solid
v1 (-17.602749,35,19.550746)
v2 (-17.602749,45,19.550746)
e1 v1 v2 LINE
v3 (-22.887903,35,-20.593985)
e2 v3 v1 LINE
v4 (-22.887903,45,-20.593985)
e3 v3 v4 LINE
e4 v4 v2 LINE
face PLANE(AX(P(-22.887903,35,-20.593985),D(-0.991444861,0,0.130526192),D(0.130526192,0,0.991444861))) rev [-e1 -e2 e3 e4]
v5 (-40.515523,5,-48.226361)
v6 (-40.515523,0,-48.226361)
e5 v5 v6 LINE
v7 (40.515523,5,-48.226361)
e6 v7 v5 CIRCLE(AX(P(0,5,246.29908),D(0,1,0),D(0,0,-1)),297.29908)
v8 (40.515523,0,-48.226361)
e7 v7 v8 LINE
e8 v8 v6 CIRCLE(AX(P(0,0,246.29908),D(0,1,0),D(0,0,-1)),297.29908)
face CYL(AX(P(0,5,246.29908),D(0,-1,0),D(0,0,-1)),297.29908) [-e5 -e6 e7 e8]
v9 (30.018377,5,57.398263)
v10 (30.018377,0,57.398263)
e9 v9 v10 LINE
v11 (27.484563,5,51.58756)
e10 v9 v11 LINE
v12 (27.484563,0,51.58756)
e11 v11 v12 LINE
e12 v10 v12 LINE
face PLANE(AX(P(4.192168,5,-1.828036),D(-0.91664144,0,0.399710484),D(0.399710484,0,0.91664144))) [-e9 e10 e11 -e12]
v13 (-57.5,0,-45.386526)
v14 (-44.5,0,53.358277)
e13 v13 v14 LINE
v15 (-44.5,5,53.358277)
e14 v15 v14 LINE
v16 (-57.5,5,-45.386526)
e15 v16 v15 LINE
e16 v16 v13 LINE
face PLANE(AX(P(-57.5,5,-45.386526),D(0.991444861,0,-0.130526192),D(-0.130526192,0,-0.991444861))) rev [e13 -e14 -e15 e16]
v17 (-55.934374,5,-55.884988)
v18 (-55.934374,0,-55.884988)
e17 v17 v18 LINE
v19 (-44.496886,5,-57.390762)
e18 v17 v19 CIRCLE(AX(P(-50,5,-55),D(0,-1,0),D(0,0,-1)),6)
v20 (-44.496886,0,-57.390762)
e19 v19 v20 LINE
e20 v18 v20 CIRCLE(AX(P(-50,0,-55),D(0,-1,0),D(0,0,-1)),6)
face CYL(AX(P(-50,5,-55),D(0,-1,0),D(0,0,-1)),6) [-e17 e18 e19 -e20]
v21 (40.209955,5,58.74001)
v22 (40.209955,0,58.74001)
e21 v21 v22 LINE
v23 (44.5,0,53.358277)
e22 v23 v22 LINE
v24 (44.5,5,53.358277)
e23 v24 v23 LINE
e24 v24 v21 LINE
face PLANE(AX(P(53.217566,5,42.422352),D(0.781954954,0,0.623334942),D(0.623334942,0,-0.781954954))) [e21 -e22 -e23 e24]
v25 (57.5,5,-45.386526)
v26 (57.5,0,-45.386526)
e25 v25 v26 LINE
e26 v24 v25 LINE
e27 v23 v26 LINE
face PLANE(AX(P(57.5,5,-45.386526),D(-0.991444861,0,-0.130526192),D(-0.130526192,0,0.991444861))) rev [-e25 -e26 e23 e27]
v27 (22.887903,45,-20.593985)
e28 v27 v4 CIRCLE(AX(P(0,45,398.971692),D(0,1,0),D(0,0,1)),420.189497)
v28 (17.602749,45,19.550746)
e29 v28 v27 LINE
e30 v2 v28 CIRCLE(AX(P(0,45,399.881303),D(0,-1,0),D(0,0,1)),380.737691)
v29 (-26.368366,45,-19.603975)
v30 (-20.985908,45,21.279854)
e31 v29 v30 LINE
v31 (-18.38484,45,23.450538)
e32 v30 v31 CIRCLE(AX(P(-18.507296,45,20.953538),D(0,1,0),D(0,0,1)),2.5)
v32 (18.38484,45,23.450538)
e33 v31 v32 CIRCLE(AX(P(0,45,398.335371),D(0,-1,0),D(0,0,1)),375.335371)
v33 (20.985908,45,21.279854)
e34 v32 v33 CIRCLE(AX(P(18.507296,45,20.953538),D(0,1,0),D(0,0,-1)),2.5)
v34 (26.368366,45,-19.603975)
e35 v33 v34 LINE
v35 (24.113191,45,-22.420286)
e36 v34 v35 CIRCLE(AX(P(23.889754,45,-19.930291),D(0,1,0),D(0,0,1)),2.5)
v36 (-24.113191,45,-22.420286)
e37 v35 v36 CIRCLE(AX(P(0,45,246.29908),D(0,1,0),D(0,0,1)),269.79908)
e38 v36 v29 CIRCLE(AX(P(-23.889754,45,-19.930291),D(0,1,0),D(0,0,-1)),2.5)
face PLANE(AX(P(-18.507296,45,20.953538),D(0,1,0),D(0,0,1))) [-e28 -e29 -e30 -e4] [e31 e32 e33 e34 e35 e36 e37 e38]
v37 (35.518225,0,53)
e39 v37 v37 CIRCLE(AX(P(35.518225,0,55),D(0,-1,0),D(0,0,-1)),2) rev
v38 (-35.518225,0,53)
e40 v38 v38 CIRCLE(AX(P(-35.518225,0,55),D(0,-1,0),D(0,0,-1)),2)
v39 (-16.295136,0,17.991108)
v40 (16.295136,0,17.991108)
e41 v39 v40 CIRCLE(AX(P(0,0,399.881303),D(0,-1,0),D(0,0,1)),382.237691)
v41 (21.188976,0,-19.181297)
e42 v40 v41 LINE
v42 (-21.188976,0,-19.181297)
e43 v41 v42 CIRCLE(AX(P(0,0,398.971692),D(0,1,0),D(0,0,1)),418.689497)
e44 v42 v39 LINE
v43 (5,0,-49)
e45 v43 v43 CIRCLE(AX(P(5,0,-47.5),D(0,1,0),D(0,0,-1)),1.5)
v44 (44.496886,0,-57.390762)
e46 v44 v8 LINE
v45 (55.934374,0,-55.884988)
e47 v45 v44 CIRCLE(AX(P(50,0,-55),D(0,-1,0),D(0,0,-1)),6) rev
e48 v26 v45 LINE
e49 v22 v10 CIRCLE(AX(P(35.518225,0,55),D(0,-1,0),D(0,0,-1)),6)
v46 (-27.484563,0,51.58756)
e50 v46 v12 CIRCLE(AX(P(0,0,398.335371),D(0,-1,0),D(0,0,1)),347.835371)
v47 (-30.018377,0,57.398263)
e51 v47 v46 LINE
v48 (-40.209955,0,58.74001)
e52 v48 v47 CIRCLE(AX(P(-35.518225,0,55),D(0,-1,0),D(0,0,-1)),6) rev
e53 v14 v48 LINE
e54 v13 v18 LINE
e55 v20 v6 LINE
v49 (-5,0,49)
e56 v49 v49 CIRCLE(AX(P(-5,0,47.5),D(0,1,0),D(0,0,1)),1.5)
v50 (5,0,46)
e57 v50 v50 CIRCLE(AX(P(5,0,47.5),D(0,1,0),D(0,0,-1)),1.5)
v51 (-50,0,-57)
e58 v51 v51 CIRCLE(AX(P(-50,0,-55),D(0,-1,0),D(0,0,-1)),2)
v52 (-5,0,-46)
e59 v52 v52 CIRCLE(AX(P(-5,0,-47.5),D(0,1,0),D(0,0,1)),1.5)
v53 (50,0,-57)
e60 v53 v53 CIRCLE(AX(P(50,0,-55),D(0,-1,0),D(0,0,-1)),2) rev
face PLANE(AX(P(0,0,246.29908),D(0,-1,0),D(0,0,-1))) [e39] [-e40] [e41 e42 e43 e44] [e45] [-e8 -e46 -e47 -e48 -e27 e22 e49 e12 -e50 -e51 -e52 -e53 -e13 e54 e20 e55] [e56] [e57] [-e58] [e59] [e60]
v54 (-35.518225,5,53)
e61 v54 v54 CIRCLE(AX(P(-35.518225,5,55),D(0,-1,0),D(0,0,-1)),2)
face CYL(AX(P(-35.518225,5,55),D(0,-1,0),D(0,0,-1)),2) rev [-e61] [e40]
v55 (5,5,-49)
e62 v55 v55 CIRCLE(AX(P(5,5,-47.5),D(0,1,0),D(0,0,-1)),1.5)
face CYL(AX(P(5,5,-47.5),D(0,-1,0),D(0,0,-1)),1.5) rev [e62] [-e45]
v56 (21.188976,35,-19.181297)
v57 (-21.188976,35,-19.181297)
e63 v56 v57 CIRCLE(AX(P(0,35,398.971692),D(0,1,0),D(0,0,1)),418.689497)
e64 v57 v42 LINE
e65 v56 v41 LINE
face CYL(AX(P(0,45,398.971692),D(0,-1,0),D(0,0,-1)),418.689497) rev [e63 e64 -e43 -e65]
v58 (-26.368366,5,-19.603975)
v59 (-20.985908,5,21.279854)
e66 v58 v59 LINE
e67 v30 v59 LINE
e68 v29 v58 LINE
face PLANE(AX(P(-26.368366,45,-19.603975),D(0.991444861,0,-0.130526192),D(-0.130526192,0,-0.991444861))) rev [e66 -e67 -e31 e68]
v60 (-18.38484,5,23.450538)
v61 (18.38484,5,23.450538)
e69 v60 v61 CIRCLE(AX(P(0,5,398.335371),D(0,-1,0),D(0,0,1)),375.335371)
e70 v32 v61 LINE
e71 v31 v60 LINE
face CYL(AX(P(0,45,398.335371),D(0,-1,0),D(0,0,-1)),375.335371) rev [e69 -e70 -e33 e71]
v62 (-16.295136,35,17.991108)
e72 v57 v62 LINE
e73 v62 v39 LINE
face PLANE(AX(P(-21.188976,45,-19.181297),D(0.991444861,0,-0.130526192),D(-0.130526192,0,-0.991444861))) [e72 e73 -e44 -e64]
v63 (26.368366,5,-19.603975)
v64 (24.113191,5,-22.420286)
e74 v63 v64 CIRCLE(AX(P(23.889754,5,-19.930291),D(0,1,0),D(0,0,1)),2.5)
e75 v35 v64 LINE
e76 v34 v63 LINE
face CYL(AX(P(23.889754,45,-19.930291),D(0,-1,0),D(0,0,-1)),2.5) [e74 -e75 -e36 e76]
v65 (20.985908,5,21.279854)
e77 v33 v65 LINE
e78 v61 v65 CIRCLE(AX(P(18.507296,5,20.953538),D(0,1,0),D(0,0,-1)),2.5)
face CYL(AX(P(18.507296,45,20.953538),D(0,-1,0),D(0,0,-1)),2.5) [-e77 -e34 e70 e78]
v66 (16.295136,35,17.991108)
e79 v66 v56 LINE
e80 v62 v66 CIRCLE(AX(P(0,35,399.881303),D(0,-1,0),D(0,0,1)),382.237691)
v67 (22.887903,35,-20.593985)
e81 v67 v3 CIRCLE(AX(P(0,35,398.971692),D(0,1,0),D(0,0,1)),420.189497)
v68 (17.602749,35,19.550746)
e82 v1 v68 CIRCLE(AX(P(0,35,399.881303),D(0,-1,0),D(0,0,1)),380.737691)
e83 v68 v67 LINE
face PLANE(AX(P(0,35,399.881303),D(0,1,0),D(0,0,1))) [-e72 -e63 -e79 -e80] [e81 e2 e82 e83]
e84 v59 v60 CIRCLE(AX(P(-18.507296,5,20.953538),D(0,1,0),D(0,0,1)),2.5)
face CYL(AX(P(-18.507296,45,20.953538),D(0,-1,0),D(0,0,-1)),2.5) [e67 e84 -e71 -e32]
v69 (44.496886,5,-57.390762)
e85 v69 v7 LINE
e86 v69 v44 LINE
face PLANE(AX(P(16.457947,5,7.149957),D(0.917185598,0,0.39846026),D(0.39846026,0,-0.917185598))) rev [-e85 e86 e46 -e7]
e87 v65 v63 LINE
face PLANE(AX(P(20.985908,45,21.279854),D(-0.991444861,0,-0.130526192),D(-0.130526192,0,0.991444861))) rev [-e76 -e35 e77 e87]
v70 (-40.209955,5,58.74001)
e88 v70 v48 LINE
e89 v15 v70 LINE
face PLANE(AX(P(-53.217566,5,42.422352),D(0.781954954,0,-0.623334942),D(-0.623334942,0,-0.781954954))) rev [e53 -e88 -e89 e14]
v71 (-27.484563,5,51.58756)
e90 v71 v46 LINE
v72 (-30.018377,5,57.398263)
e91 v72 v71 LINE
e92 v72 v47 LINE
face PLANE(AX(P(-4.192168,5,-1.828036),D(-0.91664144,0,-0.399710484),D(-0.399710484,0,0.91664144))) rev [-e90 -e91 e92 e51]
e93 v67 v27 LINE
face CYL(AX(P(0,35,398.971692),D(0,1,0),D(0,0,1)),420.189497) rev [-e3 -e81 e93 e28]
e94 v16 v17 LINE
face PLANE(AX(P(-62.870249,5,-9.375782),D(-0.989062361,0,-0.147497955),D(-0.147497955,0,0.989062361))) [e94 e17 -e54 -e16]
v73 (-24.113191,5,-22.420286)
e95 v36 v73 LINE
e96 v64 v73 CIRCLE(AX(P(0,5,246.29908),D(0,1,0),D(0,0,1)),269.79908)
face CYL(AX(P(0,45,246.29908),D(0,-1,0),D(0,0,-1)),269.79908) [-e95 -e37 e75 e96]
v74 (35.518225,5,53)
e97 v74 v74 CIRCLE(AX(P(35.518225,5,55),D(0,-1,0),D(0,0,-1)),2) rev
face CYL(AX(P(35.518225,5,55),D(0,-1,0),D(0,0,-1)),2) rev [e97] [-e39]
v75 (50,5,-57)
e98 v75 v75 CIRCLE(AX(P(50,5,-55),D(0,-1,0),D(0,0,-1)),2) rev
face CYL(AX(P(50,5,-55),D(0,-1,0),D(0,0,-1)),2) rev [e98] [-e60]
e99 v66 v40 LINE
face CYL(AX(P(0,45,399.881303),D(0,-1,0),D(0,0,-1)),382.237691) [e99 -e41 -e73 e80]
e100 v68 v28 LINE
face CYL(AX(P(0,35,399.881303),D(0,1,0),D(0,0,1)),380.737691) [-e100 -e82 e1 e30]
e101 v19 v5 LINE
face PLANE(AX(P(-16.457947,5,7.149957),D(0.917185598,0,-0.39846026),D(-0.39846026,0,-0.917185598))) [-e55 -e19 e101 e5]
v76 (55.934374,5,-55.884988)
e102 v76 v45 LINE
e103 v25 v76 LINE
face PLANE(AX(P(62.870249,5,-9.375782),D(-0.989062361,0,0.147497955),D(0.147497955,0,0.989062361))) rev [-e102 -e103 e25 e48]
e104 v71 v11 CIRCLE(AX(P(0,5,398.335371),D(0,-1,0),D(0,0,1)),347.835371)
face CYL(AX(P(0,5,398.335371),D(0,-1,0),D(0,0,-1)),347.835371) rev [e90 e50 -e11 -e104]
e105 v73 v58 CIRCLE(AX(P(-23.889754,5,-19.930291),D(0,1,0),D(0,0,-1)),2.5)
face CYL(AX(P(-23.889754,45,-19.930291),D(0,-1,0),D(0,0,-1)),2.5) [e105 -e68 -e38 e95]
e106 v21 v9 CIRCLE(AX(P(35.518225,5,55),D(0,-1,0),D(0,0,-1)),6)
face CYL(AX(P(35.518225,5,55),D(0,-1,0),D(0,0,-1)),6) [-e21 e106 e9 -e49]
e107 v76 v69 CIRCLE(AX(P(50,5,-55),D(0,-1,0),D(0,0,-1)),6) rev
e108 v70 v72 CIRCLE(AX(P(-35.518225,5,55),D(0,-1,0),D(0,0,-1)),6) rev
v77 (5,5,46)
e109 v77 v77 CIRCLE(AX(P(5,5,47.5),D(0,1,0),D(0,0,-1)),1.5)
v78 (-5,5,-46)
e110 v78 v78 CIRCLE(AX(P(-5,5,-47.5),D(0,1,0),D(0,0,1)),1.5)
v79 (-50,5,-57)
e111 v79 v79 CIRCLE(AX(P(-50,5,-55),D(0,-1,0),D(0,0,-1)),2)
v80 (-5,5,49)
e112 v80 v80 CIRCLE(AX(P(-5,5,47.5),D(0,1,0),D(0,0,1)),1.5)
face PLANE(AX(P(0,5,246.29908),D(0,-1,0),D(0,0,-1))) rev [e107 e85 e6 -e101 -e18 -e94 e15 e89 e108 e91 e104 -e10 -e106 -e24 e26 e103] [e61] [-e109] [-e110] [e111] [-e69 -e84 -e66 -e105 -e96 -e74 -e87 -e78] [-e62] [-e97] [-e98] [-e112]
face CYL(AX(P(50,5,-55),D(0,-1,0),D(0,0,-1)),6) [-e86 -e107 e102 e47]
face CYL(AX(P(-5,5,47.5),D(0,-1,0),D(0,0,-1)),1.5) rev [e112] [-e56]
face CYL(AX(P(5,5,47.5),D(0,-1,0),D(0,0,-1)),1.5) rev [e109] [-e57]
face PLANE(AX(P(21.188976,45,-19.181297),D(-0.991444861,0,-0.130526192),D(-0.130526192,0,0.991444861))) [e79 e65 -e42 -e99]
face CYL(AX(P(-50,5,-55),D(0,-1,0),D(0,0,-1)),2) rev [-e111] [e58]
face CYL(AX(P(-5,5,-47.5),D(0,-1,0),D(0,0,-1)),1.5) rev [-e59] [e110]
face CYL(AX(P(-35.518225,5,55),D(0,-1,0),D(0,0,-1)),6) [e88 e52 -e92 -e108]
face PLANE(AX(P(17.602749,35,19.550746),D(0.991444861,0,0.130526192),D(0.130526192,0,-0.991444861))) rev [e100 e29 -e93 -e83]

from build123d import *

# Parameters (mm, degrees)
SKETCH1_R               = 1.5
BOSS_EXTRUDE1_DEPTH     = 5
BOSS_EXTRUDE2_DEPTH     = 40
CUT_EXTRUDE1_DEPTH      = 91.434261951
BOSS_EXTRUDE3_START     = -5
BOSS_EXTRUDE3_OUTLINE_R = 2
BOSS_EXTRUDE3_DEPTH     = 5
CUT_EXTRUDE2_START      = -10
CUT_EXTRUDE2_DEPTH      = 10


# Read off the part's stored shape, not the designer's step: Boss-Extrude3
with BuildPart() as part:
    # Sketch1 → Boss-Extrude1 (new body)
    with BuildSketch(Plane(origin=(0, 0, 0), x_dir=(1, 0, 0), z_dir=(0, 1, 0))):
        with BuildLine():
            Line((-57.5, 45.38652637), (-44.5, -53.358277095))
            ThreePointArc((-44.5, -53.358277095), (0, -50.5), (44.5, -53.358277095))
            Line((44.5, -53.358277095), (57.5, 45.38652637))
            ThreePointArc((57.5, 45.38652637), (0, 51), (-57.5, 45.38652637))
        make_face()
        with Locations(Location((-5, 47.5, 0), (0, 0, 270))):
            Circle(SKETCH1_R, mode=Mode.SUBTRACT)
        with Locations(Location((-5, -47.5, 0), (0, 0, 270))):
            Circle(SKETCH1_R, mode=Mode.SUBTRACT)
        with Locations(Location((5, -47.5, 0), (0, 0, 90))):
            Circle(SKETCH1_R, mode=Mode.SUBTRACT)
        with Locations(Location((5, 47.5, 0), (0, 0, 90))):
            Circle(SKETCH1_R, mode=Mode.SUBTRACT)
    extrude(amount=BOSS_EXTRUDE1_DEPTH)

    # Sketch2 → Boss-Extrude2 (add)
    with BuildSketch(Plane(origin=(0, 5, 0), x_dir=(1, 0, 0), z_dir=(0, 1, 0))):
        with BuildLine():
            Line((-26.368366328, 19.603975201), (-20.985908119, -21.279853883))
            ThreePointArc((-20.985908119, -21.279853883), (-20.109118271, -22.872956361), (-18.384839881, -23.450537503))
            ThreePointArc((-18.384839881, -23.450537503), (0, -23), (18.384839881, -23.450537503))
            ThreePointArc((18.384839881, -23.450537503), (20.109118271, -22.872956361), (20.985908119, -21.279853883))
            Line((20.985908119, -21.279853883), (26.368366328, 19.603975201))
            ThreePointArc((26.368366328, 19.603975201), (25.841207036, 21.492926829), (24.11319073, 22.420285883))
            ThreePointArc((24.11319073, 22.420285883), (0, 23.5), (-24.11319073, 22.420285883))
            ThreePointArc((-24.11319073, 22.420285883), (-25.841207036, 21.492926829), (-26.368366328, 19.603975201))
        make_face()
    extrude(amount=BOSS_EXTRUDE2_DEPTH)

    # Sketch3 → Cut-Extrude1 (cut, through all)
    with BuildSketch(Plane(origin=(0, 0, 0), x_dir=(1, 0, 0), z_dir=(0, 1, 0))):
        with BuildLine():
            Line((-21.18897611, 19.181297446), (-16.295136113, -17.99110784))
            ThreePointArc((-16.295136113, -17.99110784), (0, -17.643611739), (16.295136113, -17.99110784))
            Line((16.295136113, -17.99110784), (21.18897611, 19.181297446))
            ThreePointArc((21.18897611, 19.181297446), (0, 19.717805469), (-21.18897611, 19.181297446))
        make_face()
    extrude(amount=CUT_EXTRUDE1_DEPTH, mode=Mode.SUBTRACT)

    # Boss-Extrude3 outline → Boss-Extrude3 (add)
    # profile 1 of 4: a face of its own
    with BuildSketch(Plane.XZ.offset(BOSS_EXTRUDE3_START)):
        with BuildLine():
            Line((-44.496886412, -57.390761561), (-40.51552272, -48.226360981))
            ThreePointArc((-40.51552272, -48.226360981), (-49.028326901, -46.92944202), (-57.5, -45.38652637))
            Line((-57.5, -45.38652637), (-55.934374164, -55.884987732))
            ThreePointArc((-55.934374164, -55.884987732), (-50.783157153, -60.948669168), (-44.496886412, -57.390761561))
        make_face()
        with Locations((-50, -55)):
            Circle(BOSS_EXTRUDE3_OUTLINE_R, mode=Mode.SUBTRACT)
    # profile 2 of 4: a face of its own
    with BuildSketch(Plane.XZ.offset(BOSS_EXTRUDE3_START)):
        with BuildLine():
            Line((40.51552272, -48.226360981), (44.496886412, -57.390761561))
            ThreePointArc((44.496886412, -57.390761561), (50.783157153, -60.948669168), (55.934374164, -55.884987732))
            Line((55.934374164, -55.884987732), (57.5, -45.38652637))
            ThreePointArc((57.5, -45.38652637), (49.028326901, -46.92944202), (40.51552272, -48.226360981))
        make_face()
        with Locations((50, -55)):
            Circle(BOSS_EXTRUDE3_OUTLINE_R, mode=Mode.SUBTRACT)
    # profile 3 of 4: a face of its own
    with BuildSketch(Plane.XZ.offset(BOSS_EXTRUDE3_START)):
        with BuildLine():
            Line((44.5, 53.358277095), (40.209954991, 58.740009651))
            ThreePointArc((40.209954991, 58.740009651), (34.735068112, 60.948669168), (30.018376627, 57.398262905))
            Line((30.018376627, 57.398262905), (27.484562868, 51.587560448))
            ThreePointArc((27.484562868, 51.587560448), (36.003169058, 52.368295779), (44.5, 53.358277095))
        make_face()
        with Locations((35.518225265, 55)):
            Circle(BOSS_EXTRUDE3_OUTLINE_R, mode=Mode.SUBTRACT)
    # profile 4 of 4: a face of its own
    with BuildSketch(Plane.XZ.offset(BOSS_EXTRUDE3_START)):
        with BuildLine():
            ThreePointArc((-44.5, 53.358277095), (-36.003169058, 52.368295779), (-27.484562868, 51.587560448))
            Line((-27.484562868, 51.587560448), (-30.018376627, 57.398262905))
            ThreePointArc((-30.018376627, 57.398262905), (-34.735068112, 60.948669168), (-40.209954991, 58.740009651))
            Line((-40.209954991, 58.740009651), (-44.5, 53.358277095))
        make_face()
        with Locations((-35.518225265, 55)):
            Circle(BOSS_EXTRUDE3_OUTLINE_R, mode=Mode.SUBTRACT)
    extrude(amount=BOSS_EXTRUDE3_DEPTH)

    # Sketch9 → Cut-Extrude2 (cut)
    with BuildSketch(Plane(origin=(0, 45, 0), x_dir=(1, 0, 0), z_dir=(0, 1, 0)).offset(CUT_EXTRUDE2_START)):
        with BuildLine():
            Line((17.602749325, -19.55074577), (22.887903449, 20.593985408))
            ThreePointArc((22.887903449, 20.593985408), (0, 21.217805469), (-22.887903449, 20.593985408))
            Line((-22.887903449, 20.593985408), (-17.602749325, -19.55074577))
            ThreePointArc((-17.602749325, -19.55074577), (0, -19.143611739), (17.602749325, -19.55074577))
        make_face()
        with BuildLine():
            Line((16.295136113, -17.99110784), (21.18897611, 19.181297446))
            ThreePointArc((21.18897611, 19.181297446), (0, 19.717805469), (-21.18897611, 19.181297446))
            Line((-21.18897611, 19.181297446), (-16.295136113, -17.99110784))
            ThreePointArc((-16.295136113, -17.99110784), (0, -17.643611739), (16.295136113, -17.99110784))
        make_face(mode=Mode.SUBTRACT)
    extrude(amount=CUT_EXTRUDE2_DEPTH, mode=Mode.SUBTRACT)


solid = part.part
